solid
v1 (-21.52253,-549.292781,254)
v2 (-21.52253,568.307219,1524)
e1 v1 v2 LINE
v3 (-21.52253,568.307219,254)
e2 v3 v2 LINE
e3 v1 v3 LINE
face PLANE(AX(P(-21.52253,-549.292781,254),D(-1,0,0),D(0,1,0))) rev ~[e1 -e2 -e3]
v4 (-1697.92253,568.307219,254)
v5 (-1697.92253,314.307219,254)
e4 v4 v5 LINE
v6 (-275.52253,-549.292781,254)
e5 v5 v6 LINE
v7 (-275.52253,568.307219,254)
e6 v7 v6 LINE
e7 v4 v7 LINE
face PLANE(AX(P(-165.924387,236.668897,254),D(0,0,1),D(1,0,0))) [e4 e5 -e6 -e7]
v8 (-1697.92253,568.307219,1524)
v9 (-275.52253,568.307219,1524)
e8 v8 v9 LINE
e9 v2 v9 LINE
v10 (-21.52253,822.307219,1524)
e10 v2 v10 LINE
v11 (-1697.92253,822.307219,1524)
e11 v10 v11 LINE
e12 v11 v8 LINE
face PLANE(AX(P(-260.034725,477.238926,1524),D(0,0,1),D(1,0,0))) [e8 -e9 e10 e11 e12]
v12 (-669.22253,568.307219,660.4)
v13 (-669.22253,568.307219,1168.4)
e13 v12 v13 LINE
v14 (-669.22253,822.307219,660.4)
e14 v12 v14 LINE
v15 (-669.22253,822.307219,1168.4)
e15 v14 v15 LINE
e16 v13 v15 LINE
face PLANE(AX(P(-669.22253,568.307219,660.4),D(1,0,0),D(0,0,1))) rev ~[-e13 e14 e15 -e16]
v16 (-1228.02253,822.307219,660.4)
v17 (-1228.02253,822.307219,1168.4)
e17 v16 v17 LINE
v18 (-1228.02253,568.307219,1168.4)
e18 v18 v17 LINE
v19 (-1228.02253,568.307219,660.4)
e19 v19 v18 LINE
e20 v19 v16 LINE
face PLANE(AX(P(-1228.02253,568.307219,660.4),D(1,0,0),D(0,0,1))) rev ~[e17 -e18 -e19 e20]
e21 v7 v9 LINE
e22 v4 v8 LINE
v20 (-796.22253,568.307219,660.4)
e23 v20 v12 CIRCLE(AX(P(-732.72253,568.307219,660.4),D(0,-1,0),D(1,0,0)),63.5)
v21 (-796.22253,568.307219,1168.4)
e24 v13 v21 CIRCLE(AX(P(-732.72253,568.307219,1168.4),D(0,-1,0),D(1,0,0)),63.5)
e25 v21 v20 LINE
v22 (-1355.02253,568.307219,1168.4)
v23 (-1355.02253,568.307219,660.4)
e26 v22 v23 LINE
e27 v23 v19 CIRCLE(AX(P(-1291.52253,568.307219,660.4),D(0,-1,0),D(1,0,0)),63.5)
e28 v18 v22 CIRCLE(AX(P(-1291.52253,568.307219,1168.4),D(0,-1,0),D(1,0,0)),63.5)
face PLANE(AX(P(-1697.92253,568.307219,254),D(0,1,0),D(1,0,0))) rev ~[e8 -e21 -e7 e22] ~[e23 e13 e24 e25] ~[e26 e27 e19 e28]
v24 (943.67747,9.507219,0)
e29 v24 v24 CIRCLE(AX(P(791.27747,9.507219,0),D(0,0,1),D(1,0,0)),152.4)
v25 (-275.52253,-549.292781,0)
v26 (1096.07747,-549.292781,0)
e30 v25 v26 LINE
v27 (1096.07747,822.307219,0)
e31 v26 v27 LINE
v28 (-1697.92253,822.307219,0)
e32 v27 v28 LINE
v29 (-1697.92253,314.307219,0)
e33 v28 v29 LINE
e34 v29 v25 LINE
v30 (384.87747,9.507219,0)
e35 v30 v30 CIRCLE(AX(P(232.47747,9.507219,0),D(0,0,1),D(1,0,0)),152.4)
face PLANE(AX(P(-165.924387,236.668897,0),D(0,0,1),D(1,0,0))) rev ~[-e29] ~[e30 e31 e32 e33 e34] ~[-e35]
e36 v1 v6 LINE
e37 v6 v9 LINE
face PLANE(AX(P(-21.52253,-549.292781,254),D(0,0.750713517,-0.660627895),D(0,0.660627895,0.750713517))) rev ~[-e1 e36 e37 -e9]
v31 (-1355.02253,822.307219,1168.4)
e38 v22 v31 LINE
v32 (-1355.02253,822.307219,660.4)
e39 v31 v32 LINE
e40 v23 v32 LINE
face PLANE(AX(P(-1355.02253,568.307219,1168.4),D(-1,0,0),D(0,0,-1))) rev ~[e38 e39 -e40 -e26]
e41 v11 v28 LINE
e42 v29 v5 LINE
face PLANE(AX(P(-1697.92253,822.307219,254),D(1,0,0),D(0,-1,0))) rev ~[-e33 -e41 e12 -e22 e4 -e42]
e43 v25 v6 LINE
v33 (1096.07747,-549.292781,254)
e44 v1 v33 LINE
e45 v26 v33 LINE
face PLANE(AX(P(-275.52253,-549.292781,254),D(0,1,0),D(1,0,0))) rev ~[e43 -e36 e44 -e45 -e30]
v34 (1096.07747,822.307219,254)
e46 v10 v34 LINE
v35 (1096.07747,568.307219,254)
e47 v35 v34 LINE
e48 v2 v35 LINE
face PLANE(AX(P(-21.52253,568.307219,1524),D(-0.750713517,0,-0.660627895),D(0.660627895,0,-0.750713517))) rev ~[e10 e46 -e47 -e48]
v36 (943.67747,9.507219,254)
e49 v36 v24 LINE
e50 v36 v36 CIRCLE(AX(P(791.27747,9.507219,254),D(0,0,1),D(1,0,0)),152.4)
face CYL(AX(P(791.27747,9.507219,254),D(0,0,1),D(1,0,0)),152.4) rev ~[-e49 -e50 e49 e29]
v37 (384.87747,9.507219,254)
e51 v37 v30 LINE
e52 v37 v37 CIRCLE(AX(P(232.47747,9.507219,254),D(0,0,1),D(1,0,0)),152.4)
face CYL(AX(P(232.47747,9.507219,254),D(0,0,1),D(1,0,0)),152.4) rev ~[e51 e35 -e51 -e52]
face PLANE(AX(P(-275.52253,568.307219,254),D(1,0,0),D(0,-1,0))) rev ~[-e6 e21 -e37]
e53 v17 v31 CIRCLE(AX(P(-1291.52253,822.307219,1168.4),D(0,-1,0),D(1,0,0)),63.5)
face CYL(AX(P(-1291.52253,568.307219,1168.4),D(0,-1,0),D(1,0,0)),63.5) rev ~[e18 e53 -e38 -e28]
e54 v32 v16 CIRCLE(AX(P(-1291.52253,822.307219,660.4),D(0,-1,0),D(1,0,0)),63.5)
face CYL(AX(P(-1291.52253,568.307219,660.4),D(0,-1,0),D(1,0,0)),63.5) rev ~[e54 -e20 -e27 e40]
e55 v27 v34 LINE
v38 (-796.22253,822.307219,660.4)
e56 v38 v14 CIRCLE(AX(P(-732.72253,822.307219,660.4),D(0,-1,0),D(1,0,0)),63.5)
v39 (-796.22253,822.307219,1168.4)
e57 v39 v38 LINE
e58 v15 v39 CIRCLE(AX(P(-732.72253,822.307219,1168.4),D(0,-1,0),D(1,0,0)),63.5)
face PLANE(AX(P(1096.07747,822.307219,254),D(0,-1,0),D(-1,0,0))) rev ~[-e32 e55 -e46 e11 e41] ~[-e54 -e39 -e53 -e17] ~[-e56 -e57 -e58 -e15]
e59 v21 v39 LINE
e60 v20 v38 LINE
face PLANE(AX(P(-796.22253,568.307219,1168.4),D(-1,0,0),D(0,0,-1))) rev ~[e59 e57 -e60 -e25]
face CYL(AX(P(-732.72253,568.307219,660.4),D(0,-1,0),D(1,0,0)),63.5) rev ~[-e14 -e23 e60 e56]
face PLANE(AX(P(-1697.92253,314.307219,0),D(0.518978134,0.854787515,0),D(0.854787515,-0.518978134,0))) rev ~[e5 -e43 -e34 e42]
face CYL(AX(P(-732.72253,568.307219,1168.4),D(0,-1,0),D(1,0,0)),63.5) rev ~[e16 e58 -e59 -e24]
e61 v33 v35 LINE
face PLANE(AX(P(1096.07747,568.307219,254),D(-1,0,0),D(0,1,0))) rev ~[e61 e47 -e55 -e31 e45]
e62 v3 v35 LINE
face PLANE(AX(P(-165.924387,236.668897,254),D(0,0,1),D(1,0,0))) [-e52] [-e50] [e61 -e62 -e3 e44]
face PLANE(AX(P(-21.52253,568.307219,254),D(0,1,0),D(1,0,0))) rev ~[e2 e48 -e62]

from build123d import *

# Parameters (mm, degrees)
F1_DEPTH  = 254
F3_DEPTH  = 1270
F5_DEPTH  = 701.04
F7_DEPTH  = 2278.38
F9_DEPTH  = 584.2
F10_R     = 152.4
F11_DEPTH = 1562.1


with BuildPart() as f1:
    # F0 (on Top) → F1 (new body)
    with BuildSketch(Plane.XY):
        Polygon((-1697.922529542, 314.3072188771), (-275.522529542, -549.2927811229), (1096.077470458, -549.2927811229), (1096.077470458, 822.3072188771), (-1697.922529542, 822.3072188771), align=None)
    extrude(amount=F1_DEPTH)

    # F2 (on face) → F3 (join)
    with BuildSketch(Plane.XY.offset(254)):
        Polygon((-275.522529542, 568.3072188771), (-275.522529542, -549.2927811229), (-21.522529542, -549.2927811229), (-21.522529542, 568.3072188771), (1096.077470458, 568.3072188771), (1096.077470458, 822.3072188771), (-1697.922529542, 822.3072188771), (-1697.922529542, 568.3072188771), align=None)
    extrude(amount=F3_DEPTH)

    # F4 (on face) → F5 (cut)
    with BuildSketch(Plane.XZ.offset(-568.3072188771)):
        Polygon((1096.077470458, 1524), (-21.522529542, 1524), (1096.077470458, 254), align=None)
    extrude(amount=-F5_DEPTH, mode=Mode.SUBTRACT)

    # F6 (on face) → F7 (cut)
    with BuildSketch(Plane.YZ.offset(-21.522529542)):
        Polygon((-549.2927811229, 254), (568.3072188771, 1524), (-549.2927811229, 1524), align=None)
    extrude(amount=-F7_DEPTH, mode=Mode.SUBTRACT)

    # F8 (on face) → F9 (cut)
    with BuildSketch(Plane.XZ.offset(-568.3072188771)):
        with BuildLine():
            ThreePointArc((-1355.022529542, 1168.4), (-1291.522529542, 1104.9), (-1228.022529542, 1168.4))
            ThreePointArc((-1228.022529542, 1168.4), (-1291.522529542, 1231.9), (-1355.022529542, 1168.4))
        make_face()
        with BuildLine():
            Line((-1228.022529542, 660.4), (-1228.022529542, 1168.4))
            ThreePointArc((-1228.022529542, 1168.4), (-1291.522529542, 1104.9), (-1355.022529542, 1168.4))
            Line((-1355.022529542, 1168.4), (-1355.022529542, 660.4))
            ThreePointArc((-1355.022529542, 660.4), (-1291.522529542, 723.9), (-1228.022529542, 660.4))
        make_face()
        with BuildLine():
            ThreePointArc((-1355.022529542, 660.4), (-1291.522529542, 596.9), (-1228.022529542, 660.4))
            ThreePointArc((-1228.022529542, 660.4), (-1291.522529542, 723.9), (-1355.022529542, 660.4))
        make_face()
        with BuildLine():
            ThreePointArc((-796.222529542, 1168.4), (-732.722529542, 1104.9), (-669.222529542, 1168.4))
            ThreePointArc((-669.222529542, 1168.4), (-732.722529542, 1231.9), (-796.222529542, 1168.4))
        make_face()
        with BuildLine():
            Line((-669.222529542, 660.4), (-669.222529542, 1168.4))
            ThreePointArc((-669.222529542, 1168.4), (-732.722529542, 1104.9), (-796.222529542, 1168.4))
            Line((-796.222529542, 1168.4), (-796.222529542, 660.4))
            ThreePointArc((-796.222529542, 660.4), (-732.722529542, 723.9), (-669.222529542, 660.4))
        make_face()
        with BuildLine():
            ThreePointArc((-796.222529542, 660.4), (-732.722529542, 596.9), (-669.222529542, 660.4))
            ThreePointArc((-669.222529542, 660.4), (-732.722529542, 723.9), (-796.222529542, 660.4))
        make_face()
    extrude(amount=-F9_DEPTH, mode=Mode.SUBTRACT)

    # F10 (on face) → F11 (cut)
    with BuildSketch(Plane.XY.offset(254)):
        with Locations((232.477470458, 9.5072188771)):
            Circle(F10_R)
        with Locations((791.277470458, 9.5072188771)):
            Circle(F10_R)
    extrude(amount=-F11_DEPTH, mode=Mode.SUBTRACT)


solid = f1.part
